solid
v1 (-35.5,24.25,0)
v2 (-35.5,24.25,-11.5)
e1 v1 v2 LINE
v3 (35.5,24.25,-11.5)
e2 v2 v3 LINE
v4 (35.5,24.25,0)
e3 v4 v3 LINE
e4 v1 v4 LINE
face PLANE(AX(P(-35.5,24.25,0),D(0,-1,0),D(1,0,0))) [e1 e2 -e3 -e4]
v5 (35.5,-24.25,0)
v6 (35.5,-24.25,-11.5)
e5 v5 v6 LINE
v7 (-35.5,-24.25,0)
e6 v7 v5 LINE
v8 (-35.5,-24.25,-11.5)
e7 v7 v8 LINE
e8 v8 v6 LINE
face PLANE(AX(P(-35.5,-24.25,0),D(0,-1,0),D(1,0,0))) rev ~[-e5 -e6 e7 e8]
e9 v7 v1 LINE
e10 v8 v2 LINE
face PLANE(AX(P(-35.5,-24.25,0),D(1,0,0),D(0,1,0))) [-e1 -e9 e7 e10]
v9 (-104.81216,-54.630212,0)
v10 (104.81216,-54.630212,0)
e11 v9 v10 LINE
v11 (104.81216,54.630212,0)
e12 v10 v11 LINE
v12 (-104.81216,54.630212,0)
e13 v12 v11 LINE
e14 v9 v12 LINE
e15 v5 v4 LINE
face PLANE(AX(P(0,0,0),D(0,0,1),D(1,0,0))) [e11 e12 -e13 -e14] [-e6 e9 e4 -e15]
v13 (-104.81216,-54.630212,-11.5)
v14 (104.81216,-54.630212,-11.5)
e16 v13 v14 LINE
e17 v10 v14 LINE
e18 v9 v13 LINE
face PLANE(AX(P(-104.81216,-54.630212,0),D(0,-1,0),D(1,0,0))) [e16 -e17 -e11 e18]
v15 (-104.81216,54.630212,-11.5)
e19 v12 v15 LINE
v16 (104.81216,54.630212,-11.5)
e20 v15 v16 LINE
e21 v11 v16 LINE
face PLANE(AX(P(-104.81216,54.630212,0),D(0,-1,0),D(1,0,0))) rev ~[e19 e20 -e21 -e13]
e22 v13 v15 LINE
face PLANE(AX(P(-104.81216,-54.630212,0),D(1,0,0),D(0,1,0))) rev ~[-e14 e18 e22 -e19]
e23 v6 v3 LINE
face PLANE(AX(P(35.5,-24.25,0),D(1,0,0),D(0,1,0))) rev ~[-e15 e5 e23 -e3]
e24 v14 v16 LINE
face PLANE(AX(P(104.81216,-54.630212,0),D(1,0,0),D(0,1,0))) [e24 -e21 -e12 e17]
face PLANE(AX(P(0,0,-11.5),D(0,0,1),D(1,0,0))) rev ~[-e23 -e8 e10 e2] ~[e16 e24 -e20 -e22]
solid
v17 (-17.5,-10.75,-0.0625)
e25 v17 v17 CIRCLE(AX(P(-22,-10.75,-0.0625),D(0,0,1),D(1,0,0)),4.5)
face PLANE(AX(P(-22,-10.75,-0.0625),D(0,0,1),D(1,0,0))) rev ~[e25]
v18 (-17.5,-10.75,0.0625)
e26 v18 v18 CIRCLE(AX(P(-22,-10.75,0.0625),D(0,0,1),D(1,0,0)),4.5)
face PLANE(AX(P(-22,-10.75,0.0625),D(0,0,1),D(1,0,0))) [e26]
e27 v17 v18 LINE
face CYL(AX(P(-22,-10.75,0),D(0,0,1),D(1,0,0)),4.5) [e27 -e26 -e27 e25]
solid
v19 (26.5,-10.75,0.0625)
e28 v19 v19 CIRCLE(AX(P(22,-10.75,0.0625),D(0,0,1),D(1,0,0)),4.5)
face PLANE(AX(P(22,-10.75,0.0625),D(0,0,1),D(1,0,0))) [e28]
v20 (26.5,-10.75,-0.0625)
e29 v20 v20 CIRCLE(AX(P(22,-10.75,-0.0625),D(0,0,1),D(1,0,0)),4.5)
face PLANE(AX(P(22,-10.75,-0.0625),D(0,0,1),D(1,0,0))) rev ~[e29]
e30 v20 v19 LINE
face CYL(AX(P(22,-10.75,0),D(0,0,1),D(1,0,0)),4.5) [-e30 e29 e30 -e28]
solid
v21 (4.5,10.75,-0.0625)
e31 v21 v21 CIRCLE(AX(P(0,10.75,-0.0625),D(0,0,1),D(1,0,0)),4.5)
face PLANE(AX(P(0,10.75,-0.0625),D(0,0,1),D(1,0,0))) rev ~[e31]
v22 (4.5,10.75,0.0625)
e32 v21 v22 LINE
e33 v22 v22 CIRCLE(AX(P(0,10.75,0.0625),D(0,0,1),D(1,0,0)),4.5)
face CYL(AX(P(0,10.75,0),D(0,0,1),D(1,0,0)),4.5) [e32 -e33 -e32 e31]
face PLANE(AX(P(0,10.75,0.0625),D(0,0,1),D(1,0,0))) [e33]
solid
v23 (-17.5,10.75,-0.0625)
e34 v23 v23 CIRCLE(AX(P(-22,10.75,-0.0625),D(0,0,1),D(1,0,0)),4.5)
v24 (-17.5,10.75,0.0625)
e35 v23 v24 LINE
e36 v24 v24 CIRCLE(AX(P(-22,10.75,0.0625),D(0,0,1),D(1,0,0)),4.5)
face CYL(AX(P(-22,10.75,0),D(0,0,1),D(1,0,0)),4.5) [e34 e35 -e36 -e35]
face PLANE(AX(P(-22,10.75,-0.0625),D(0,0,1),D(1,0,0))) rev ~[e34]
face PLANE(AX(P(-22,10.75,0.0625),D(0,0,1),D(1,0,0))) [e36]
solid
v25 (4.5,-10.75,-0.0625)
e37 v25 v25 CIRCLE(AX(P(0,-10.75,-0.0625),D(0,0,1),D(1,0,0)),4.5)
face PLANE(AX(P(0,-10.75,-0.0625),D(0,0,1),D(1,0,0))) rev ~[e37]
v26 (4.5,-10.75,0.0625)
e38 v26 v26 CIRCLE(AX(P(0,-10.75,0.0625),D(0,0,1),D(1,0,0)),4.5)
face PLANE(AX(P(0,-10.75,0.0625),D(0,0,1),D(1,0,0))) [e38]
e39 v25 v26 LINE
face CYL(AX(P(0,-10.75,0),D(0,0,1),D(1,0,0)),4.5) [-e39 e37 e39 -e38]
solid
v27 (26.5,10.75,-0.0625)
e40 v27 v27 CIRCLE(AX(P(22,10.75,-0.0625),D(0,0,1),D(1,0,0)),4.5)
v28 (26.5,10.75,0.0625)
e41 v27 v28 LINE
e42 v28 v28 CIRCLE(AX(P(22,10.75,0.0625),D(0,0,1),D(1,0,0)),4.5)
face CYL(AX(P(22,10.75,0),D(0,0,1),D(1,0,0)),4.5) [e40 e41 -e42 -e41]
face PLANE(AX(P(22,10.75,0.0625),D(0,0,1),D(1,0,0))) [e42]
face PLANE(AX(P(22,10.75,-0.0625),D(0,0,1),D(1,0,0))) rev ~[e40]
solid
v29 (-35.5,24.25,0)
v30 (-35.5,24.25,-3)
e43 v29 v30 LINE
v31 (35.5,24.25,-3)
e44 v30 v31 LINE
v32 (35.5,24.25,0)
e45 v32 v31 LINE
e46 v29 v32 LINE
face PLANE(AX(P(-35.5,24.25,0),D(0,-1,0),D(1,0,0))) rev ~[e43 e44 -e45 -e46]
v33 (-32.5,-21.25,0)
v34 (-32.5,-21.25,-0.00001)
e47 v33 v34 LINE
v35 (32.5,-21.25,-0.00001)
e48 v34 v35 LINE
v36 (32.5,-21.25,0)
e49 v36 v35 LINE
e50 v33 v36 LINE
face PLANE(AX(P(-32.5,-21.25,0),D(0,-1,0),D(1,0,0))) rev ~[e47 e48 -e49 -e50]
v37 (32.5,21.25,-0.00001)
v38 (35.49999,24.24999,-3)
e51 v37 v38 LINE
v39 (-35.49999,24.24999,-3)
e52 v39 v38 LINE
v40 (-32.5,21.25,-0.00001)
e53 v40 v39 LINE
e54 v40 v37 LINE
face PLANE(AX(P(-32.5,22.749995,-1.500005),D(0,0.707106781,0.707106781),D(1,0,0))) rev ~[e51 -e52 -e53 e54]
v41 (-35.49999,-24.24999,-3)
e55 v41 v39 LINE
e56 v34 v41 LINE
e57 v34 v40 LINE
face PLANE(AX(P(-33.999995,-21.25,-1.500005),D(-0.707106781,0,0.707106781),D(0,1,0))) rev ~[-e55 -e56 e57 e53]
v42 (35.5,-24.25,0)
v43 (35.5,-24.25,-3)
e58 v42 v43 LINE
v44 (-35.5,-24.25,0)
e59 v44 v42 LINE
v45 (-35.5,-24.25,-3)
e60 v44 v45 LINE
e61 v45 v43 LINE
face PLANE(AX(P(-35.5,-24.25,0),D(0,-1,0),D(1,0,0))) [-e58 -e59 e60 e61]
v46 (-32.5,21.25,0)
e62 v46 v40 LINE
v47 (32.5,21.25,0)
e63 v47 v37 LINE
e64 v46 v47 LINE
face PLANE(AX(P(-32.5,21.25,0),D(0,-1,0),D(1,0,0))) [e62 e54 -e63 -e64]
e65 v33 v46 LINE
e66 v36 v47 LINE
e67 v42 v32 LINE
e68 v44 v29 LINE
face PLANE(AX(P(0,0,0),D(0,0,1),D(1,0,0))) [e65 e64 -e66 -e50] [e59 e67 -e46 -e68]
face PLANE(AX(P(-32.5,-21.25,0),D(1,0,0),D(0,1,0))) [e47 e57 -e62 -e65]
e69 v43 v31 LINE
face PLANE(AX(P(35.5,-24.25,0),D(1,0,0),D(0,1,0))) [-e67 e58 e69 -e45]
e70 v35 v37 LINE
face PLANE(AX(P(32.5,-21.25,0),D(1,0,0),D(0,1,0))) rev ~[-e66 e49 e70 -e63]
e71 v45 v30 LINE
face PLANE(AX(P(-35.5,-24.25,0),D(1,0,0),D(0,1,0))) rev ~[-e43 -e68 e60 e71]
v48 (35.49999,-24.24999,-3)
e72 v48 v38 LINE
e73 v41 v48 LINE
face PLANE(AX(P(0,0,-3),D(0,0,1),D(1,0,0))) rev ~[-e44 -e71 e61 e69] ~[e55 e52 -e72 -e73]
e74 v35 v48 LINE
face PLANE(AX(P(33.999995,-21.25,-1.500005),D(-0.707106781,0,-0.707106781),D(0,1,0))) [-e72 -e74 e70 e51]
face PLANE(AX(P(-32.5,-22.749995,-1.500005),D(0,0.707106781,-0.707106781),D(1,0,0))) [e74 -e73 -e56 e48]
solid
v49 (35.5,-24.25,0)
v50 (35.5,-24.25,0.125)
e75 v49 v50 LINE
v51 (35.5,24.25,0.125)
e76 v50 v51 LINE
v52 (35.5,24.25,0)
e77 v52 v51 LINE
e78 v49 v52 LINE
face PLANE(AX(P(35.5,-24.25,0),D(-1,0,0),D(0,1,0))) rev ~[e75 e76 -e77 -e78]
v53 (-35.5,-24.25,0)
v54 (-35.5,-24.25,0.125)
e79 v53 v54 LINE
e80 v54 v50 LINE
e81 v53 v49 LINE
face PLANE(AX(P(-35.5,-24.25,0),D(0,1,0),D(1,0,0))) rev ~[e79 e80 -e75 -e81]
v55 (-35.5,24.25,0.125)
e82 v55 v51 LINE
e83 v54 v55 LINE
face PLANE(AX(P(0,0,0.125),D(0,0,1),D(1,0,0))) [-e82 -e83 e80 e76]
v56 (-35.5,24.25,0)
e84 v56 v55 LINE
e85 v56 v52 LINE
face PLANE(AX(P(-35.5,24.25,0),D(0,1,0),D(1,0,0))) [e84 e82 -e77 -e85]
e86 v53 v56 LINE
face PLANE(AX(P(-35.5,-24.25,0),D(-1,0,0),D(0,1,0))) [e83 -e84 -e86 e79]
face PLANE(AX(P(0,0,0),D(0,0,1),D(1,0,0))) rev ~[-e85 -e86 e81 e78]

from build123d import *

# Parameters (mm, degrees)
F0_W     = 209.6243202686
F0_H     = 109.2604249716
F0_W_2   = 71
F0_H_2   = 48.5
F1_DEPTH = 11.5
F0_W_3   = 65
F0_H_3   = 42.5
F0_R     = 4.5
F2_DEPTH = 0.125
F3_DEPTH = 3
F4_SIZE  = 2.99999
F5_DEPTH = 0.0625


# Not quite as in the source:
# - a fillet or chamfer is up to 0.001 mm smaller than in the source, because OpenCascade refuses the exact size


with BuildPart() as f1:
    # F0 (on Top) → F1 (new body)
    with BuildSketch(Plane.XY):
        Rectangle(F0_W, F0_H)
        Rectangle(F0_W_2, F0_H_2, mode=Mode.SUBTRACT)
    extrude(amount=-F1_DEPTH)


with BuildPart() as f2:
    # F0 (on Top) → F2 (new body)
    with BuildSketch(Plane.XY):
        Rectangle(F0_W_2, F0_H_2)
        Rectangle(F0_W_3, F0_H_3, mode=Mode.SUBTRACT)
        Rectangle(F0_W_3, F0_H_3)
        with Locations((-22, -10.75)):
            Circle(F0_R, mode=Mode.SUBTRACT)
        with Locations((0, -10.75)):
            Circle(F0_R, mode=Mode.SUBTRACT)
        with Locations((22, -10.75)):
            Circle(F0_R, mode=Mode.SUBTRACT)
        with Locations((-22, 10.75)):
            Circle(F0_R, mode=Mode.SUBTRACT)
        with Locations((0, 10.75)):
            Circle(F0_R, mode=Mode.SUBTRACT)
        with Locations((22, 10.75)):
            Circle(F0_R, mode=Mode.SUBTRACT)
        with Locations((22, -10.75)):
            Circle(F0_R)
        with Locations((0, -10.75)):
            Circle(F0_R)
        with Locations((-22, -10.75)):
            Circle(F0_R)
        with Locations((-22, 10.75)):
            Circle(F0_R)
        with Locations((0, 10.75)):
            Circle(F0_R)
        with Locations((22, 10.75)):
            Circle(F0_R)
    extrude(amount=F2_DEPTH)


with BuildPart() as f3:
    # F0 (on Top) → F3 (new body)
    with BuildSketch(Plane.XY):
        Rectangle(F0_W_2, F0_H_2)
        Rectangle(F0_W_3, F0_H_3, mode=Mode.SUBTRACT)
    extrude(amount=-F3_DEPTH)

    # F4 (size 3 in the source; OpenCascade refuses exactly that, so slightly less here)
    f4_edges = [f3.edges().sort_by_distance(p)[0] for p in [
        (32.5, 0, -3),
        (0, -21.25, -3),
        (0, 21.25, -3),
        (-32.5, 0, -3),
    ]]
    chamfer(f4_edges, length=F4_SIZE)


with BuildPart() as f5:
    # F0 (on Top) → F5 (new body, symmetric)
    with BuildSketch(Plane.XY):
        with Locations((22, -10.75)):
            Circle(F0_R)
    extrude(amount=F5_DEPTH, both=True)


with BuildPart() as f5b:
    # F0 (on Top) → F5, piece 2 (new body, symmetric)
    with BuildSketch(Plane.XY):
        with Locations((22, 10.75)):
            Circle(F0_R)
    extrude(amount=F5_DEPTH, both=True)


with BuildPart() as f5c:
    # F0 (on Top) → F5, piece 3 (new body, symmetric)
    with BuildSketch(Plane.XY):
        with Locations((0, 10.75)):
            Circle(F0_R)
    extrude(amount=F5_DEPTH, both=True)


with BuildPart() as f5d:
    # F0 (on Top) → F5, piece 4 (new body, symmetric)
    with BuildSketch(Plane.XY):
        with Locations((0, -10.75)):
            Circle(F0_R)
    extrude(amount=F5_DEPTH, both=True)


with BuildPart() as f5e:
    # F0 (on Top) → F5, piece 5 (new body, symmetric)
    with BuildSketch(Plane.XY):
        with Locations((-22, 10.75)):
            Circle(F0_R)
    extrude(amount=F5_DEPTH, both=True)


with BuildPart() as f5f:
    # F0 (on Top) → F5, piece 6 (new body, symmetric)
    with BuildSketch(Plane.XY):
        with Locations((-22, -10.75)):
            Circle(F0_R)
    extrude(amount=F5_DEPTH, both=True)


solid = Compound([f1.part, f2.part, f3.part, f5.part, f5b.part, f5c.part, f5d.part, f5e.part, f5f.part])
